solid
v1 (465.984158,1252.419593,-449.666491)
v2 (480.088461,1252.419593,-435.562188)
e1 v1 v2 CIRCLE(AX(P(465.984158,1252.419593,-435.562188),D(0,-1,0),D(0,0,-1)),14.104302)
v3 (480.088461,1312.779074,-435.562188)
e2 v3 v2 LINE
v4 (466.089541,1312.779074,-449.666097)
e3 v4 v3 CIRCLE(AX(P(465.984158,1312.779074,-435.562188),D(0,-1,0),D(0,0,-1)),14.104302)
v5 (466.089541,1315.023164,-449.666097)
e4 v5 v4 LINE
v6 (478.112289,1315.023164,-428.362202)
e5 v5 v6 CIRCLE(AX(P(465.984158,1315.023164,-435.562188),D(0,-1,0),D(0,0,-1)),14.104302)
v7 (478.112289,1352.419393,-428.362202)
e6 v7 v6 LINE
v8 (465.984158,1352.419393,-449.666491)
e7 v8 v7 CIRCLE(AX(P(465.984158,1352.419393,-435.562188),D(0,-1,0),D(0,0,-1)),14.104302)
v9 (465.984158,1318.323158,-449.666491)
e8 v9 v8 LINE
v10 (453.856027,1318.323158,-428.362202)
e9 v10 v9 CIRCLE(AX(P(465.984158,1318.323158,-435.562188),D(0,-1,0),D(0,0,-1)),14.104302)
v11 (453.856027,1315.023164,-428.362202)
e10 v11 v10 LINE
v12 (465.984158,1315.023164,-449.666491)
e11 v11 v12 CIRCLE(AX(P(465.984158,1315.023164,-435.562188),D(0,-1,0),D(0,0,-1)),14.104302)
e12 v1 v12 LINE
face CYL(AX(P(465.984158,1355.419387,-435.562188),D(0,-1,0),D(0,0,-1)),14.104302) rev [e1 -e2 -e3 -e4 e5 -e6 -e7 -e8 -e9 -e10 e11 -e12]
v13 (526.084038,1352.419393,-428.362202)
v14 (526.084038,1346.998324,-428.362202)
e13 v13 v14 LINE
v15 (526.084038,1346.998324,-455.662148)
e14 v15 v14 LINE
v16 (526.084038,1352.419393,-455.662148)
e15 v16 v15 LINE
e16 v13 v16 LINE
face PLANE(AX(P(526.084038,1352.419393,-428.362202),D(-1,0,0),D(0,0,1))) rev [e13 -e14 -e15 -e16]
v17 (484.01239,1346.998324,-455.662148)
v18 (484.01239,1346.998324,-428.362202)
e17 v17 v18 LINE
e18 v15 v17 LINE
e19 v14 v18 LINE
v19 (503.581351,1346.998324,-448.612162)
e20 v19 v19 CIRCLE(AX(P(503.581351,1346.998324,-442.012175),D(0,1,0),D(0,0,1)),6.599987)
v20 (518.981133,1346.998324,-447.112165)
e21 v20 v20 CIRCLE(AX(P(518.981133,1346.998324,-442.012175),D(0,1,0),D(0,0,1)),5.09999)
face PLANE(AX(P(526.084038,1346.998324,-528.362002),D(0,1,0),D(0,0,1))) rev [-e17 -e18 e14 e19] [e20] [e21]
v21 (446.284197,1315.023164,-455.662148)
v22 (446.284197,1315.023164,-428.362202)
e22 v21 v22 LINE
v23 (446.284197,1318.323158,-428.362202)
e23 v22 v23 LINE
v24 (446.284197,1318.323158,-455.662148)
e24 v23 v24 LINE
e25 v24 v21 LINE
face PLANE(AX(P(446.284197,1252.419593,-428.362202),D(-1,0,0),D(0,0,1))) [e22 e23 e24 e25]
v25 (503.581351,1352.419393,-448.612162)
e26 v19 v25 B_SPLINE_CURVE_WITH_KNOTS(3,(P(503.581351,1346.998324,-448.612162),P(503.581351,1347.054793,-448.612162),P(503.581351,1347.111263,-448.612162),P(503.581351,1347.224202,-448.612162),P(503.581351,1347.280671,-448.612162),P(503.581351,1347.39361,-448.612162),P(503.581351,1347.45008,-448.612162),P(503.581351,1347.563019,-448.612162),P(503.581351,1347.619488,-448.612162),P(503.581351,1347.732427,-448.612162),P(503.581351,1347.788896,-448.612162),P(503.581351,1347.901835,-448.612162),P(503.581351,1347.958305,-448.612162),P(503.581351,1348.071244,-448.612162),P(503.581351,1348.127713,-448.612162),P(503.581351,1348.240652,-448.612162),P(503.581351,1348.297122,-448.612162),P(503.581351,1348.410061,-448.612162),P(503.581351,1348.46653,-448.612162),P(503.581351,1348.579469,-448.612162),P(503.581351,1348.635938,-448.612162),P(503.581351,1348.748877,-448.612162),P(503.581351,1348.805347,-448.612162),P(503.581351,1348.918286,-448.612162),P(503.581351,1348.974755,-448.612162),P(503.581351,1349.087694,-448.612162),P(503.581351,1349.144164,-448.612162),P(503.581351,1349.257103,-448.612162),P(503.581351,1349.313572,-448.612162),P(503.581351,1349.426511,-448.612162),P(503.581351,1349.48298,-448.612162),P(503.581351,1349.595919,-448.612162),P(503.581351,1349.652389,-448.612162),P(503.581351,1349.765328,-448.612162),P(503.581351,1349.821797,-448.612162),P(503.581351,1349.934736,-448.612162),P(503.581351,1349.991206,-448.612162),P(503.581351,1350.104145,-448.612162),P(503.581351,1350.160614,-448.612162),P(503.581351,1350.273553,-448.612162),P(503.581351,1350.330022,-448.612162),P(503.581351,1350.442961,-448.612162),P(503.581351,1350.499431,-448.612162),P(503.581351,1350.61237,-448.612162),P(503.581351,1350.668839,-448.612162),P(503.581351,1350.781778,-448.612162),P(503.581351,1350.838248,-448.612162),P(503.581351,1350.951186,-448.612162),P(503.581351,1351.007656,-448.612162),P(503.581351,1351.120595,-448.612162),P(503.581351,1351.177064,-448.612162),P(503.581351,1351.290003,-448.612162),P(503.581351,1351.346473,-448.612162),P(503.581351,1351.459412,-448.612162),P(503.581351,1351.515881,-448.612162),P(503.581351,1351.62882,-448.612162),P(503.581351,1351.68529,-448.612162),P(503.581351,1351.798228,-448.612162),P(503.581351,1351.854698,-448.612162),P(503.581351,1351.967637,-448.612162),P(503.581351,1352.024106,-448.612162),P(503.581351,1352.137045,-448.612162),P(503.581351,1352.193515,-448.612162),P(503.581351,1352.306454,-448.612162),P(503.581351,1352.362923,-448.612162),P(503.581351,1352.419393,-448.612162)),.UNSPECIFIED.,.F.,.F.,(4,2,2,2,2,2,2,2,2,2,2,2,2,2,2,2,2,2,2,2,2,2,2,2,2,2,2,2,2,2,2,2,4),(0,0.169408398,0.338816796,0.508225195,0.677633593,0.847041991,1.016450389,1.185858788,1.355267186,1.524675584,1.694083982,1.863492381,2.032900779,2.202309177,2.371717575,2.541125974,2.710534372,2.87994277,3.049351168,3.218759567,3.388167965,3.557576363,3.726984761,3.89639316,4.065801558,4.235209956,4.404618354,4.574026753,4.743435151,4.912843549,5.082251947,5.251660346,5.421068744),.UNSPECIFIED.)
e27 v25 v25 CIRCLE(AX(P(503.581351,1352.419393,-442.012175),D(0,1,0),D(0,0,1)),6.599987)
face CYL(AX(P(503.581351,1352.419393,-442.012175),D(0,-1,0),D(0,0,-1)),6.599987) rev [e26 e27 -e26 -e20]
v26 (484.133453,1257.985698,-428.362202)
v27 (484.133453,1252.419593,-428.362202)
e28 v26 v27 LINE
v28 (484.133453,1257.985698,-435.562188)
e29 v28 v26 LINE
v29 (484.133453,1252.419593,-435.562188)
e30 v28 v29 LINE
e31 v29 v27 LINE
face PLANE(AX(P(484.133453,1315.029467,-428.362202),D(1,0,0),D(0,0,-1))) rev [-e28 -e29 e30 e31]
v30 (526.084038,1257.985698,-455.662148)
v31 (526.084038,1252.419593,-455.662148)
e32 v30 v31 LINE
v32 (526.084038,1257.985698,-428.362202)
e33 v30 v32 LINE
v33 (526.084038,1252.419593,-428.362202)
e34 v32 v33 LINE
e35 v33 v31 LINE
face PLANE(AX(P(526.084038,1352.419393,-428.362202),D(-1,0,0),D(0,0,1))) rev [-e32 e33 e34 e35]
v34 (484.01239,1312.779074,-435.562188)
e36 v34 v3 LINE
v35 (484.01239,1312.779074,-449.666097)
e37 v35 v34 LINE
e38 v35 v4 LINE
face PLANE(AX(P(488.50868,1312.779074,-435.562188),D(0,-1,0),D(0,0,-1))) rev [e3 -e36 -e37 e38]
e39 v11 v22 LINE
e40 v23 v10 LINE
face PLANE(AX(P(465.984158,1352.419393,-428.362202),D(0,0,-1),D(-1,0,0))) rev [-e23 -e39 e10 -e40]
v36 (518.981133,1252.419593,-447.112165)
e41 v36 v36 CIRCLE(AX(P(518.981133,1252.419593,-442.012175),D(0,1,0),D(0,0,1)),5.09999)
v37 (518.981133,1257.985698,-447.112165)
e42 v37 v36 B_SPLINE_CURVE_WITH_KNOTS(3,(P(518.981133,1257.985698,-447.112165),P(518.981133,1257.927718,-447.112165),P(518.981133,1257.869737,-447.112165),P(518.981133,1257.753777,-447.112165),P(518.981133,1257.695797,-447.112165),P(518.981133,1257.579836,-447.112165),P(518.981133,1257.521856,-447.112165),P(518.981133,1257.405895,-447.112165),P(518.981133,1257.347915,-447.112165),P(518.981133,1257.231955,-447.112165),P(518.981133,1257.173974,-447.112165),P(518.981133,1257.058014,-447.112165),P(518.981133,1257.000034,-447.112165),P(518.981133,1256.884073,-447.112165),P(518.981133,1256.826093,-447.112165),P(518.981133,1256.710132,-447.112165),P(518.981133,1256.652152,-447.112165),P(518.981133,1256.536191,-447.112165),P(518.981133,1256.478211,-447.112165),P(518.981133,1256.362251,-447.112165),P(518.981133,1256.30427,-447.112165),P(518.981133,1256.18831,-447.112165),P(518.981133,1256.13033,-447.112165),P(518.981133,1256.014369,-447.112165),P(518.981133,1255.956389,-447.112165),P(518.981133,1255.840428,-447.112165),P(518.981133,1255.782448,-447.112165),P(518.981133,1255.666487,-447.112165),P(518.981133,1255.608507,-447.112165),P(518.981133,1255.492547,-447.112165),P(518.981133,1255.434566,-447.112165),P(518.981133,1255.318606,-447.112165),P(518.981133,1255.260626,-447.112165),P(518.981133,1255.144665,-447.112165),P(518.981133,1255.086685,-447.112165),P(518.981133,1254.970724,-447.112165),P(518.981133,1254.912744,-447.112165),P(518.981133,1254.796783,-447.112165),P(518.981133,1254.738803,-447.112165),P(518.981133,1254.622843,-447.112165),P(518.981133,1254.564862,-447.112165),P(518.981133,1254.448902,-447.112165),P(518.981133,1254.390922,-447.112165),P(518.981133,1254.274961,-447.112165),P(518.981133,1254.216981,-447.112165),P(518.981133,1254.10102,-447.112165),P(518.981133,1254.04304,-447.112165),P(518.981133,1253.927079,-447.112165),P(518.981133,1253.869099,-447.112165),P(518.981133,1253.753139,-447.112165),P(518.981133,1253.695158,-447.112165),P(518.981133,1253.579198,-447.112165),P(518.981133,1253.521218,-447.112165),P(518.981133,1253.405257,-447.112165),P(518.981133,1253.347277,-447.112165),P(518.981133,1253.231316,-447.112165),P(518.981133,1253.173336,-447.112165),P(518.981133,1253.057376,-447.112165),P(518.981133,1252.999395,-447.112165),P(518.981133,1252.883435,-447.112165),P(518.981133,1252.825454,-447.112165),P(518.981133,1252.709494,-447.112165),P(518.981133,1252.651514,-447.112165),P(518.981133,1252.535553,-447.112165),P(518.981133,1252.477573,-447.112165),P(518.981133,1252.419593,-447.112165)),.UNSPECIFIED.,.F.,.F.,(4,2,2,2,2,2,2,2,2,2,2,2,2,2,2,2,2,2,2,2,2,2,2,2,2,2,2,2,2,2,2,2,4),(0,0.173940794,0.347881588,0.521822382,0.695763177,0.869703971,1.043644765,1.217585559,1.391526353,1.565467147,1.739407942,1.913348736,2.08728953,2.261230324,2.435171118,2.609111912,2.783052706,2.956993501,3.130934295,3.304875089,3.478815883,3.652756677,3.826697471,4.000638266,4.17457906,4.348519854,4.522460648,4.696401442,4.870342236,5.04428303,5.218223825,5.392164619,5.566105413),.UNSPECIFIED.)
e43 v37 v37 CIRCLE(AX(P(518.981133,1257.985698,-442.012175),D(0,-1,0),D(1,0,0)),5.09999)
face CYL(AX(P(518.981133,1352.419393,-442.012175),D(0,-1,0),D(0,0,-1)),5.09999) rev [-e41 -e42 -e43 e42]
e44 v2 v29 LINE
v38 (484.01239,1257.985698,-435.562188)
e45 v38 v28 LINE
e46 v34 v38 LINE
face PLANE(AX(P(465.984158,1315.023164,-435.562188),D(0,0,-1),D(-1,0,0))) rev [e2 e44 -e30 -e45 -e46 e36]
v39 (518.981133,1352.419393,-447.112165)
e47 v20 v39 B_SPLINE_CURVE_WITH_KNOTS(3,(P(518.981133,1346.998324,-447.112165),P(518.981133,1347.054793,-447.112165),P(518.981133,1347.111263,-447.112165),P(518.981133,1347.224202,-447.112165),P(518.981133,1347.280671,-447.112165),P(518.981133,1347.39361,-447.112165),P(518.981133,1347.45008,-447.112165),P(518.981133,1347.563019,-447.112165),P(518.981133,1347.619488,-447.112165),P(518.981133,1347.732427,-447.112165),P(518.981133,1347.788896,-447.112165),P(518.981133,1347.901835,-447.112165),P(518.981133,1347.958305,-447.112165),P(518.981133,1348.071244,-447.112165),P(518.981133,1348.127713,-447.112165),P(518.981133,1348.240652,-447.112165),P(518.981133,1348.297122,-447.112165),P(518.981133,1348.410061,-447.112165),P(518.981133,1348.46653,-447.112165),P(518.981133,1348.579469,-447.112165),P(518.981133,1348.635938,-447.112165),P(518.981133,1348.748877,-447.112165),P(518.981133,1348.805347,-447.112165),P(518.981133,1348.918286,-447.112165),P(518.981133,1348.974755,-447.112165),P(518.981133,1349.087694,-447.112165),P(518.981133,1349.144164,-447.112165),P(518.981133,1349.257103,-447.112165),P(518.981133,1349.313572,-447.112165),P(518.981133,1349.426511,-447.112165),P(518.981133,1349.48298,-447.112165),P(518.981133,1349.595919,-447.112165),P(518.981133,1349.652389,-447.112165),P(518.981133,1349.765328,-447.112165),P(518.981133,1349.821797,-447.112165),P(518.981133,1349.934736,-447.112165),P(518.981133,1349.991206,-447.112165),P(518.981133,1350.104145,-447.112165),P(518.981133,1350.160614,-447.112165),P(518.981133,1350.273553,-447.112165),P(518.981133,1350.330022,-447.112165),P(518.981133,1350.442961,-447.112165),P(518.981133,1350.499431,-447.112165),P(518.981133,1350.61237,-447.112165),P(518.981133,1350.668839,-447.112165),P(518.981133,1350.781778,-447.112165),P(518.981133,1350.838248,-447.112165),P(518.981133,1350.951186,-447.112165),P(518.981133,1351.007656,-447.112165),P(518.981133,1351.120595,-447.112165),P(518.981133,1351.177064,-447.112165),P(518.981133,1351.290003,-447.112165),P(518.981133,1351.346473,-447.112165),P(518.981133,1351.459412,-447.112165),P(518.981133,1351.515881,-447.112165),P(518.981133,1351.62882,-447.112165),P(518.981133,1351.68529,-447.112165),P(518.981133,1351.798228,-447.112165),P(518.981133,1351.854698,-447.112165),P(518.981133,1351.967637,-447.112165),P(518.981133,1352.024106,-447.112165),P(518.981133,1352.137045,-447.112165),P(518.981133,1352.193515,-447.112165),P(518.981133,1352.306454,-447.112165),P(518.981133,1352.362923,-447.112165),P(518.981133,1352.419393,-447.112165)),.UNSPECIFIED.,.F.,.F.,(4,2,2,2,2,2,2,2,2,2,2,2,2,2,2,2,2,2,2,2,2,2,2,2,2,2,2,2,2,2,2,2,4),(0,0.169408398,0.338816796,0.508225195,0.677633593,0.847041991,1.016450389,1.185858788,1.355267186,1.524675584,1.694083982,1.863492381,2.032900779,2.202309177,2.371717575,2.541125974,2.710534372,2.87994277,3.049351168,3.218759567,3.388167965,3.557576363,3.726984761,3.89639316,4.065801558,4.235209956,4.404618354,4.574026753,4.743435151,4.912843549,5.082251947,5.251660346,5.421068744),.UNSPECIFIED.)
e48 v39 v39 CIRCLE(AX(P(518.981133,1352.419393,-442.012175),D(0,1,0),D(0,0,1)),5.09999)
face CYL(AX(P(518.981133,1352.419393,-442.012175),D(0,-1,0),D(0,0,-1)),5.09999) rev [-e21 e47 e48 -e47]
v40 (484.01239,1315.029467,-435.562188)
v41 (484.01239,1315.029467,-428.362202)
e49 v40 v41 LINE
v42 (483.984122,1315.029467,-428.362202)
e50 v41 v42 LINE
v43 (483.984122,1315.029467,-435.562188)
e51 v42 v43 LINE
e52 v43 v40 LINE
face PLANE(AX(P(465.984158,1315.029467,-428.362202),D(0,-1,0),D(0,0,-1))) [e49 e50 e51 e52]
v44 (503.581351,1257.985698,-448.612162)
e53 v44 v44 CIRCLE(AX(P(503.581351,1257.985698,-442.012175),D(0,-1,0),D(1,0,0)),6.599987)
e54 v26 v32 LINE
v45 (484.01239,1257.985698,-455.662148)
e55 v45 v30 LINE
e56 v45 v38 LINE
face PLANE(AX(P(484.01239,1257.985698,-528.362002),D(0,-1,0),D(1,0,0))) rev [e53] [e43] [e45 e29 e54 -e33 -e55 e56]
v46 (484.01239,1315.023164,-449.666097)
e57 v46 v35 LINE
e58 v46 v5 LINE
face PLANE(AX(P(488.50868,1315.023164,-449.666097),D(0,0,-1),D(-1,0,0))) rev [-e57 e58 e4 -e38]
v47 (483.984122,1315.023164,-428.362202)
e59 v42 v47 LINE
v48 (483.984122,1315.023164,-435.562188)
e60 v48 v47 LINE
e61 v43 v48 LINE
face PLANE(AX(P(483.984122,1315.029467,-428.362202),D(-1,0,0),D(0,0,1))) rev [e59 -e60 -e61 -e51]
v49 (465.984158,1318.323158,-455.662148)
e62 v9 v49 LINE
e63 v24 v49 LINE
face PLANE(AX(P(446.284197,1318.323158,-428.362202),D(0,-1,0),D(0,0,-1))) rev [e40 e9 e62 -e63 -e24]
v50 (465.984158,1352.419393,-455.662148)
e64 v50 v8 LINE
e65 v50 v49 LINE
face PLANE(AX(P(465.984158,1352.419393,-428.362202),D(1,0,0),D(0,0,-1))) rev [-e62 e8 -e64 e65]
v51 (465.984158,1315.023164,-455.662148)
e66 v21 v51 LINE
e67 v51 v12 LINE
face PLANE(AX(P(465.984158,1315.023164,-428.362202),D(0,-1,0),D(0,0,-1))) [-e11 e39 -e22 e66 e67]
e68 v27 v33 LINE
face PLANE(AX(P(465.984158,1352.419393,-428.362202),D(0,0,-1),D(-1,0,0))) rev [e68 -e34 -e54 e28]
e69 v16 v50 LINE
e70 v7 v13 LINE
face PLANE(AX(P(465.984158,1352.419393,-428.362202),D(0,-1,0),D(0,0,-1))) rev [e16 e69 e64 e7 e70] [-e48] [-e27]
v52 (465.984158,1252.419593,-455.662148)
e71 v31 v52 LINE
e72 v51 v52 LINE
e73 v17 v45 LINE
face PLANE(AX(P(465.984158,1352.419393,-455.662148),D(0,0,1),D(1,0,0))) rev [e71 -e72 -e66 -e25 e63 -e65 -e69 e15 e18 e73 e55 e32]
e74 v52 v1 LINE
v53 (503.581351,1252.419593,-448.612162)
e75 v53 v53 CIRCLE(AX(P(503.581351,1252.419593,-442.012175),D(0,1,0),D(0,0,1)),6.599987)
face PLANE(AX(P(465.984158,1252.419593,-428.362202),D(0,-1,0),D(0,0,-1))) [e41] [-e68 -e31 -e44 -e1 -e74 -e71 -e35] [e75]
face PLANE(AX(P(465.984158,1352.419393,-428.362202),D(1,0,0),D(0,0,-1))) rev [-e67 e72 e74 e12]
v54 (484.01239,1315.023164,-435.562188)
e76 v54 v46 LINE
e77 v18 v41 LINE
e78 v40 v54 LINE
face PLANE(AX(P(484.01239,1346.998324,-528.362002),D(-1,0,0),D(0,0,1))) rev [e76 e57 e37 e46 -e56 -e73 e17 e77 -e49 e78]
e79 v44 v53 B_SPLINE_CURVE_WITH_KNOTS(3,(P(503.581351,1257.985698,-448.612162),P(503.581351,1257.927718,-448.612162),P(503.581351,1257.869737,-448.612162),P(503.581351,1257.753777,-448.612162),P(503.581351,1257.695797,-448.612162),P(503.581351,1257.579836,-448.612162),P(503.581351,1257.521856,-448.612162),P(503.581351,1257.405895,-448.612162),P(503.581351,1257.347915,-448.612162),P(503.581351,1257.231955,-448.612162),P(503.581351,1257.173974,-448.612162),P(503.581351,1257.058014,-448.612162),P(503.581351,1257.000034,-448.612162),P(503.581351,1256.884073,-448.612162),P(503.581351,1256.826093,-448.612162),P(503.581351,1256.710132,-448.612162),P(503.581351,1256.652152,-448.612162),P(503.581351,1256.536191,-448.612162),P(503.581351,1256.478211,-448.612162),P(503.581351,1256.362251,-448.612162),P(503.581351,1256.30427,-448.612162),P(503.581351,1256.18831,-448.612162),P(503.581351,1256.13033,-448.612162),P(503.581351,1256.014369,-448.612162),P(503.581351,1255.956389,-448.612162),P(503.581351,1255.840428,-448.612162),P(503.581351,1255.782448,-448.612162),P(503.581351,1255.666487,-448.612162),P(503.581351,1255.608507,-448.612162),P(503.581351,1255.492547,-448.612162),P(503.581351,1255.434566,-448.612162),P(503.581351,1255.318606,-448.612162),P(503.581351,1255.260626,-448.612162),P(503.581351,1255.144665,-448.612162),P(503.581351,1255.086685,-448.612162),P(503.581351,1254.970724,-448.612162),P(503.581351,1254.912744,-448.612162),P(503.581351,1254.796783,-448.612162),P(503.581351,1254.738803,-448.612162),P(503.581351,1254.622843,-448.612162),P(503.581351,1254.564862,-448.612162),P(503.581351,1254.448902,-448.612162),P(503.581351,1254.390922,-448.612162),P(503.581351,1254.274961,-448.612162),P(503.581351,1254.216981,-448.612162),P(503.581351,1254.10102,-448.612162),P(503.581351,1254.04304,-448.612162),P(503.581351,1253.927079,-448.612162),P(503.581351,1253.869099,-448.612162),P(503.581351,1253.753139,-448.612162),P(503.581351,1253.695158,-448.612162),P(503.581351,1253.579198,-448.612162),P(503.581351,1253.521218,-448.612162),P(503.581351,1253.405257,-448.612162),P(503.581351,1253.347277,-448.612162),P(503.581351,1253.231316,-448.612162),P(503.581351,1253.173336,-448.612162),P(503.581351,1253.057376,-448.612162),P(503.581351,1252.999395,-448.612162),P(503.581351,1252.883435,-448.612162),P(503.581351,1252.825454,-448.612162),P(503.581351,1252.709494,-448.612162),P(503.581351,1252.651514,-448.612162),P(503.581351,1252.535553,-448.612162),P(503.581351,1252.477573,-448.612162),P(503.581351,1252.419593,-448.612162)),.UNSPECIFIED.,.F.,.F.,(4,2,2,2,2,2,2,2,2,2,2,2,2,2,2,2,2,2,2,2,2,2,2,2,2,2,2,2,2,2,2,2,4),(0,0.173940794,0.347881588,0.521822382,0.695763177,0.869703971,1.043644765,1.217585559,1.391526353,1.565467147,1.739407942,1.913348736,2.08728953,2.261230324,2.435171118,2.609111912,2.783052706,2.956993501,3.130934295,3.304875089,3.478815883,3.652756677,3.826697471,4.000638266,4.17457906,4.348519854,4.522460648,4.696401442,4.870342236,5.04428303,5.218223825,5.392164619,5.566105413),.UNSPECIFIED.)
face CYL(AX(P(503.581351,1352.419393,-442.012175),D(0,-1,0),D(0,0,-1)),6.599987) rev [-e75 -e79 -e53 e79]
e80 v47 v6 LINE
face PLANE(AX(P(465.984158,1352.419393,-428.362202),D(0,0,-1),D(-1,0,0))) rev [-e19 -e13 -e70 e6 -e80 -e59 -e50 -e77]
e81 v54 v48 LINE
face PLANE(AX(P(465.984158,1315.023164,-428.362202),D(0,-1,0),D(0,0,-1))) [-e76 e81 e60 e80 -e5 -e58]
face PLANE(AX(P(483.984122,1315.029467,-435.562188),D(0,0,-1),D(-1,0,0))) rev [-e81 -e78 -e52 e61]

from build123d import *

# Parameters (mm, degrees)
SKETCH1_W              = 1526.54
SKETCH1_H              = 693.42
SKETCH1_R              = 129.54
SKETCH1_R_2            = 167.64
BOSS_EXTRUDE1_DEPTH    = 2540
SKETCH6_W              = 1068.621988509
SKETCH6_H              = 2260.925218267
CUT_EXTRUDE1_DEPTH     = 2540
CUT_EXTRUDE2_START     = -1590.133899231
CUT_EXTRUDE2_OUTLINE_W = 457.2
CUT_EXTRUDE2_OUTLINE_H = 182.88
CUT_EXTRUDE2_DEPTH     = 1590.133899231
SKETCH21_W             = 358.24
SKETCH21_H             = 57
CUT_EXTRUDE3_DEPTH     = 572.124
SKETCH22_W             = 693.42
SKETCH22_H             = 83.82
BOSS_EXTRUDE3_DEPTH    = 500.38
CUT_EXTRUDE4_DEPTH     = 2616.2
SKETCH24_R             = 358.25
CUT_EXTRUDE5_DEPTH     = 2616.2
SKETCH25_W             = 3.793020403
SKETCH25_H             = 182.88
CUT_EXTRUDE7_DEPTH     = 1590.294
SCALE1_SCALE           = 0.03937


# Read off the part's stored shape, not the designer's step: Cut-Extrude2
with BuildPart() as part:
    # Sketch1 → Boss-Extrude1 (new body)
    with BuildSketch(Plane(origin=(0, 0, 0), x_dir=(1, 0, 0), z_dir=(0, 1, 0))):
        with Locations((763.27, 346.71)):
            Rectangle(SKETCH1_W, SKETCH1_H)
        with Locations(Location((1346.125866933, 346.71, 0), (0, 0, 90))):
            Circle(SKETCH1_R, mode=Mode.SUBTRACT)
        with Locations(Location((954.97060339, 346.71, 0), (0, 0, 90))):
            Circle(SKETCH1_R_2, mode=Mode.SUBTRACT)
    extrude(amount=BOSS_EXTRUDE1_DEPTH)

    # Sketch6 → Cut-Extrude1 (cut)
    with BuildSketch(Plane.XY):
        with Locations((992.229005746, 1271.841969381)):
            Rectangle(SKETCH6_W, SKETCH6_H)
    extrude(amount=-CUT_EXTRUDE1_DEPTH, mode=Mode.SUBTRACT)

    # Cut-Extrude2 outline → Cut-Extrude2 (cut)
    with BuildSketch(Plane.XZ.offset(CUT_EXTRUDE2_START)):
        with Locations((228.6, -91.44)):
            Rectangle(CUT_EXTRUDE2_OUTLINE_W, CUT_EXTRUDE2_OUTLINE_H)
    extrude(amount=CUT_EXTRUDE2_DEPTH, mode=Mode.SUBTRACT)

    # Sketch21 → Cut-Extrude3 (cut)
    with BuildSketch(Plane.ZY):
        with Locations((-362, 1561.633899231)):
            Rectangle(SKETCH21_W, SKETCH21_H)
    extrude(amount=-CUT_EXTRUDE3_DEPTH, mode=Mode.SUBTRACT)

    # Sketch22 → Boss-Extrude3 (add)
    with BuildSketch(Plane.ZY):
        with Locations((-346.71, 1632.043899231)):
            Rectangle(SKETCH22_W, SKETCH22_H)
    extrude(amount=BOSS_EXTRUDE3_DEPTH)

    # Sketch23 → Cut-Extrude4 (cut)
    with BuildSketch(Plane.XZ):
        with BuildLine():
            Line((343.932135816, -182.88), (358.25, -182.88))
            ThreePointArc((358.25, -182.88), (-253.32100436, 70.44100436), (0, -541.13))
            Line((0, -541.13), (0, -182.88))
            Line((0, -182.88), (343.932135816, -182.88))
        make_face()
    extrude(amount=-CUT_EXTRUDE4_DEPTH, mode=Mode.SUBTRACT)

    # Sketch24 → Cut-Extrude5 (cut)
    with BuildSketch(Plane.XZ):
        with Locations((0, -182.88)):
            Circle(SKETCH24_R)
    extrude(amount=-CUT_EXTRUDE5_DEPTH, mode=Mode.SUBTRACT)

    # Sketch25 → Cut-Extrude7 (cut)
    with BuildSketch(Plane.XZ):
        with Locations((459.096510201, -91.44)):
            Rectangle(SKETCH25_W, SKETCH25_H)
    extrude(amount=-CUT_EXTRUDE7_DEPTH, mode=Mode.SUBTRACT)


with BuildPart() as part_1:
    # Scale1: scaled about (485.081829704, 1303.748157577, -445.917993823)
    add(part.part.scale(SCALE1_SCALE).moved(Location((465.984158069, 1252.419592613, -428.362202406))))


solid = part_1.part
